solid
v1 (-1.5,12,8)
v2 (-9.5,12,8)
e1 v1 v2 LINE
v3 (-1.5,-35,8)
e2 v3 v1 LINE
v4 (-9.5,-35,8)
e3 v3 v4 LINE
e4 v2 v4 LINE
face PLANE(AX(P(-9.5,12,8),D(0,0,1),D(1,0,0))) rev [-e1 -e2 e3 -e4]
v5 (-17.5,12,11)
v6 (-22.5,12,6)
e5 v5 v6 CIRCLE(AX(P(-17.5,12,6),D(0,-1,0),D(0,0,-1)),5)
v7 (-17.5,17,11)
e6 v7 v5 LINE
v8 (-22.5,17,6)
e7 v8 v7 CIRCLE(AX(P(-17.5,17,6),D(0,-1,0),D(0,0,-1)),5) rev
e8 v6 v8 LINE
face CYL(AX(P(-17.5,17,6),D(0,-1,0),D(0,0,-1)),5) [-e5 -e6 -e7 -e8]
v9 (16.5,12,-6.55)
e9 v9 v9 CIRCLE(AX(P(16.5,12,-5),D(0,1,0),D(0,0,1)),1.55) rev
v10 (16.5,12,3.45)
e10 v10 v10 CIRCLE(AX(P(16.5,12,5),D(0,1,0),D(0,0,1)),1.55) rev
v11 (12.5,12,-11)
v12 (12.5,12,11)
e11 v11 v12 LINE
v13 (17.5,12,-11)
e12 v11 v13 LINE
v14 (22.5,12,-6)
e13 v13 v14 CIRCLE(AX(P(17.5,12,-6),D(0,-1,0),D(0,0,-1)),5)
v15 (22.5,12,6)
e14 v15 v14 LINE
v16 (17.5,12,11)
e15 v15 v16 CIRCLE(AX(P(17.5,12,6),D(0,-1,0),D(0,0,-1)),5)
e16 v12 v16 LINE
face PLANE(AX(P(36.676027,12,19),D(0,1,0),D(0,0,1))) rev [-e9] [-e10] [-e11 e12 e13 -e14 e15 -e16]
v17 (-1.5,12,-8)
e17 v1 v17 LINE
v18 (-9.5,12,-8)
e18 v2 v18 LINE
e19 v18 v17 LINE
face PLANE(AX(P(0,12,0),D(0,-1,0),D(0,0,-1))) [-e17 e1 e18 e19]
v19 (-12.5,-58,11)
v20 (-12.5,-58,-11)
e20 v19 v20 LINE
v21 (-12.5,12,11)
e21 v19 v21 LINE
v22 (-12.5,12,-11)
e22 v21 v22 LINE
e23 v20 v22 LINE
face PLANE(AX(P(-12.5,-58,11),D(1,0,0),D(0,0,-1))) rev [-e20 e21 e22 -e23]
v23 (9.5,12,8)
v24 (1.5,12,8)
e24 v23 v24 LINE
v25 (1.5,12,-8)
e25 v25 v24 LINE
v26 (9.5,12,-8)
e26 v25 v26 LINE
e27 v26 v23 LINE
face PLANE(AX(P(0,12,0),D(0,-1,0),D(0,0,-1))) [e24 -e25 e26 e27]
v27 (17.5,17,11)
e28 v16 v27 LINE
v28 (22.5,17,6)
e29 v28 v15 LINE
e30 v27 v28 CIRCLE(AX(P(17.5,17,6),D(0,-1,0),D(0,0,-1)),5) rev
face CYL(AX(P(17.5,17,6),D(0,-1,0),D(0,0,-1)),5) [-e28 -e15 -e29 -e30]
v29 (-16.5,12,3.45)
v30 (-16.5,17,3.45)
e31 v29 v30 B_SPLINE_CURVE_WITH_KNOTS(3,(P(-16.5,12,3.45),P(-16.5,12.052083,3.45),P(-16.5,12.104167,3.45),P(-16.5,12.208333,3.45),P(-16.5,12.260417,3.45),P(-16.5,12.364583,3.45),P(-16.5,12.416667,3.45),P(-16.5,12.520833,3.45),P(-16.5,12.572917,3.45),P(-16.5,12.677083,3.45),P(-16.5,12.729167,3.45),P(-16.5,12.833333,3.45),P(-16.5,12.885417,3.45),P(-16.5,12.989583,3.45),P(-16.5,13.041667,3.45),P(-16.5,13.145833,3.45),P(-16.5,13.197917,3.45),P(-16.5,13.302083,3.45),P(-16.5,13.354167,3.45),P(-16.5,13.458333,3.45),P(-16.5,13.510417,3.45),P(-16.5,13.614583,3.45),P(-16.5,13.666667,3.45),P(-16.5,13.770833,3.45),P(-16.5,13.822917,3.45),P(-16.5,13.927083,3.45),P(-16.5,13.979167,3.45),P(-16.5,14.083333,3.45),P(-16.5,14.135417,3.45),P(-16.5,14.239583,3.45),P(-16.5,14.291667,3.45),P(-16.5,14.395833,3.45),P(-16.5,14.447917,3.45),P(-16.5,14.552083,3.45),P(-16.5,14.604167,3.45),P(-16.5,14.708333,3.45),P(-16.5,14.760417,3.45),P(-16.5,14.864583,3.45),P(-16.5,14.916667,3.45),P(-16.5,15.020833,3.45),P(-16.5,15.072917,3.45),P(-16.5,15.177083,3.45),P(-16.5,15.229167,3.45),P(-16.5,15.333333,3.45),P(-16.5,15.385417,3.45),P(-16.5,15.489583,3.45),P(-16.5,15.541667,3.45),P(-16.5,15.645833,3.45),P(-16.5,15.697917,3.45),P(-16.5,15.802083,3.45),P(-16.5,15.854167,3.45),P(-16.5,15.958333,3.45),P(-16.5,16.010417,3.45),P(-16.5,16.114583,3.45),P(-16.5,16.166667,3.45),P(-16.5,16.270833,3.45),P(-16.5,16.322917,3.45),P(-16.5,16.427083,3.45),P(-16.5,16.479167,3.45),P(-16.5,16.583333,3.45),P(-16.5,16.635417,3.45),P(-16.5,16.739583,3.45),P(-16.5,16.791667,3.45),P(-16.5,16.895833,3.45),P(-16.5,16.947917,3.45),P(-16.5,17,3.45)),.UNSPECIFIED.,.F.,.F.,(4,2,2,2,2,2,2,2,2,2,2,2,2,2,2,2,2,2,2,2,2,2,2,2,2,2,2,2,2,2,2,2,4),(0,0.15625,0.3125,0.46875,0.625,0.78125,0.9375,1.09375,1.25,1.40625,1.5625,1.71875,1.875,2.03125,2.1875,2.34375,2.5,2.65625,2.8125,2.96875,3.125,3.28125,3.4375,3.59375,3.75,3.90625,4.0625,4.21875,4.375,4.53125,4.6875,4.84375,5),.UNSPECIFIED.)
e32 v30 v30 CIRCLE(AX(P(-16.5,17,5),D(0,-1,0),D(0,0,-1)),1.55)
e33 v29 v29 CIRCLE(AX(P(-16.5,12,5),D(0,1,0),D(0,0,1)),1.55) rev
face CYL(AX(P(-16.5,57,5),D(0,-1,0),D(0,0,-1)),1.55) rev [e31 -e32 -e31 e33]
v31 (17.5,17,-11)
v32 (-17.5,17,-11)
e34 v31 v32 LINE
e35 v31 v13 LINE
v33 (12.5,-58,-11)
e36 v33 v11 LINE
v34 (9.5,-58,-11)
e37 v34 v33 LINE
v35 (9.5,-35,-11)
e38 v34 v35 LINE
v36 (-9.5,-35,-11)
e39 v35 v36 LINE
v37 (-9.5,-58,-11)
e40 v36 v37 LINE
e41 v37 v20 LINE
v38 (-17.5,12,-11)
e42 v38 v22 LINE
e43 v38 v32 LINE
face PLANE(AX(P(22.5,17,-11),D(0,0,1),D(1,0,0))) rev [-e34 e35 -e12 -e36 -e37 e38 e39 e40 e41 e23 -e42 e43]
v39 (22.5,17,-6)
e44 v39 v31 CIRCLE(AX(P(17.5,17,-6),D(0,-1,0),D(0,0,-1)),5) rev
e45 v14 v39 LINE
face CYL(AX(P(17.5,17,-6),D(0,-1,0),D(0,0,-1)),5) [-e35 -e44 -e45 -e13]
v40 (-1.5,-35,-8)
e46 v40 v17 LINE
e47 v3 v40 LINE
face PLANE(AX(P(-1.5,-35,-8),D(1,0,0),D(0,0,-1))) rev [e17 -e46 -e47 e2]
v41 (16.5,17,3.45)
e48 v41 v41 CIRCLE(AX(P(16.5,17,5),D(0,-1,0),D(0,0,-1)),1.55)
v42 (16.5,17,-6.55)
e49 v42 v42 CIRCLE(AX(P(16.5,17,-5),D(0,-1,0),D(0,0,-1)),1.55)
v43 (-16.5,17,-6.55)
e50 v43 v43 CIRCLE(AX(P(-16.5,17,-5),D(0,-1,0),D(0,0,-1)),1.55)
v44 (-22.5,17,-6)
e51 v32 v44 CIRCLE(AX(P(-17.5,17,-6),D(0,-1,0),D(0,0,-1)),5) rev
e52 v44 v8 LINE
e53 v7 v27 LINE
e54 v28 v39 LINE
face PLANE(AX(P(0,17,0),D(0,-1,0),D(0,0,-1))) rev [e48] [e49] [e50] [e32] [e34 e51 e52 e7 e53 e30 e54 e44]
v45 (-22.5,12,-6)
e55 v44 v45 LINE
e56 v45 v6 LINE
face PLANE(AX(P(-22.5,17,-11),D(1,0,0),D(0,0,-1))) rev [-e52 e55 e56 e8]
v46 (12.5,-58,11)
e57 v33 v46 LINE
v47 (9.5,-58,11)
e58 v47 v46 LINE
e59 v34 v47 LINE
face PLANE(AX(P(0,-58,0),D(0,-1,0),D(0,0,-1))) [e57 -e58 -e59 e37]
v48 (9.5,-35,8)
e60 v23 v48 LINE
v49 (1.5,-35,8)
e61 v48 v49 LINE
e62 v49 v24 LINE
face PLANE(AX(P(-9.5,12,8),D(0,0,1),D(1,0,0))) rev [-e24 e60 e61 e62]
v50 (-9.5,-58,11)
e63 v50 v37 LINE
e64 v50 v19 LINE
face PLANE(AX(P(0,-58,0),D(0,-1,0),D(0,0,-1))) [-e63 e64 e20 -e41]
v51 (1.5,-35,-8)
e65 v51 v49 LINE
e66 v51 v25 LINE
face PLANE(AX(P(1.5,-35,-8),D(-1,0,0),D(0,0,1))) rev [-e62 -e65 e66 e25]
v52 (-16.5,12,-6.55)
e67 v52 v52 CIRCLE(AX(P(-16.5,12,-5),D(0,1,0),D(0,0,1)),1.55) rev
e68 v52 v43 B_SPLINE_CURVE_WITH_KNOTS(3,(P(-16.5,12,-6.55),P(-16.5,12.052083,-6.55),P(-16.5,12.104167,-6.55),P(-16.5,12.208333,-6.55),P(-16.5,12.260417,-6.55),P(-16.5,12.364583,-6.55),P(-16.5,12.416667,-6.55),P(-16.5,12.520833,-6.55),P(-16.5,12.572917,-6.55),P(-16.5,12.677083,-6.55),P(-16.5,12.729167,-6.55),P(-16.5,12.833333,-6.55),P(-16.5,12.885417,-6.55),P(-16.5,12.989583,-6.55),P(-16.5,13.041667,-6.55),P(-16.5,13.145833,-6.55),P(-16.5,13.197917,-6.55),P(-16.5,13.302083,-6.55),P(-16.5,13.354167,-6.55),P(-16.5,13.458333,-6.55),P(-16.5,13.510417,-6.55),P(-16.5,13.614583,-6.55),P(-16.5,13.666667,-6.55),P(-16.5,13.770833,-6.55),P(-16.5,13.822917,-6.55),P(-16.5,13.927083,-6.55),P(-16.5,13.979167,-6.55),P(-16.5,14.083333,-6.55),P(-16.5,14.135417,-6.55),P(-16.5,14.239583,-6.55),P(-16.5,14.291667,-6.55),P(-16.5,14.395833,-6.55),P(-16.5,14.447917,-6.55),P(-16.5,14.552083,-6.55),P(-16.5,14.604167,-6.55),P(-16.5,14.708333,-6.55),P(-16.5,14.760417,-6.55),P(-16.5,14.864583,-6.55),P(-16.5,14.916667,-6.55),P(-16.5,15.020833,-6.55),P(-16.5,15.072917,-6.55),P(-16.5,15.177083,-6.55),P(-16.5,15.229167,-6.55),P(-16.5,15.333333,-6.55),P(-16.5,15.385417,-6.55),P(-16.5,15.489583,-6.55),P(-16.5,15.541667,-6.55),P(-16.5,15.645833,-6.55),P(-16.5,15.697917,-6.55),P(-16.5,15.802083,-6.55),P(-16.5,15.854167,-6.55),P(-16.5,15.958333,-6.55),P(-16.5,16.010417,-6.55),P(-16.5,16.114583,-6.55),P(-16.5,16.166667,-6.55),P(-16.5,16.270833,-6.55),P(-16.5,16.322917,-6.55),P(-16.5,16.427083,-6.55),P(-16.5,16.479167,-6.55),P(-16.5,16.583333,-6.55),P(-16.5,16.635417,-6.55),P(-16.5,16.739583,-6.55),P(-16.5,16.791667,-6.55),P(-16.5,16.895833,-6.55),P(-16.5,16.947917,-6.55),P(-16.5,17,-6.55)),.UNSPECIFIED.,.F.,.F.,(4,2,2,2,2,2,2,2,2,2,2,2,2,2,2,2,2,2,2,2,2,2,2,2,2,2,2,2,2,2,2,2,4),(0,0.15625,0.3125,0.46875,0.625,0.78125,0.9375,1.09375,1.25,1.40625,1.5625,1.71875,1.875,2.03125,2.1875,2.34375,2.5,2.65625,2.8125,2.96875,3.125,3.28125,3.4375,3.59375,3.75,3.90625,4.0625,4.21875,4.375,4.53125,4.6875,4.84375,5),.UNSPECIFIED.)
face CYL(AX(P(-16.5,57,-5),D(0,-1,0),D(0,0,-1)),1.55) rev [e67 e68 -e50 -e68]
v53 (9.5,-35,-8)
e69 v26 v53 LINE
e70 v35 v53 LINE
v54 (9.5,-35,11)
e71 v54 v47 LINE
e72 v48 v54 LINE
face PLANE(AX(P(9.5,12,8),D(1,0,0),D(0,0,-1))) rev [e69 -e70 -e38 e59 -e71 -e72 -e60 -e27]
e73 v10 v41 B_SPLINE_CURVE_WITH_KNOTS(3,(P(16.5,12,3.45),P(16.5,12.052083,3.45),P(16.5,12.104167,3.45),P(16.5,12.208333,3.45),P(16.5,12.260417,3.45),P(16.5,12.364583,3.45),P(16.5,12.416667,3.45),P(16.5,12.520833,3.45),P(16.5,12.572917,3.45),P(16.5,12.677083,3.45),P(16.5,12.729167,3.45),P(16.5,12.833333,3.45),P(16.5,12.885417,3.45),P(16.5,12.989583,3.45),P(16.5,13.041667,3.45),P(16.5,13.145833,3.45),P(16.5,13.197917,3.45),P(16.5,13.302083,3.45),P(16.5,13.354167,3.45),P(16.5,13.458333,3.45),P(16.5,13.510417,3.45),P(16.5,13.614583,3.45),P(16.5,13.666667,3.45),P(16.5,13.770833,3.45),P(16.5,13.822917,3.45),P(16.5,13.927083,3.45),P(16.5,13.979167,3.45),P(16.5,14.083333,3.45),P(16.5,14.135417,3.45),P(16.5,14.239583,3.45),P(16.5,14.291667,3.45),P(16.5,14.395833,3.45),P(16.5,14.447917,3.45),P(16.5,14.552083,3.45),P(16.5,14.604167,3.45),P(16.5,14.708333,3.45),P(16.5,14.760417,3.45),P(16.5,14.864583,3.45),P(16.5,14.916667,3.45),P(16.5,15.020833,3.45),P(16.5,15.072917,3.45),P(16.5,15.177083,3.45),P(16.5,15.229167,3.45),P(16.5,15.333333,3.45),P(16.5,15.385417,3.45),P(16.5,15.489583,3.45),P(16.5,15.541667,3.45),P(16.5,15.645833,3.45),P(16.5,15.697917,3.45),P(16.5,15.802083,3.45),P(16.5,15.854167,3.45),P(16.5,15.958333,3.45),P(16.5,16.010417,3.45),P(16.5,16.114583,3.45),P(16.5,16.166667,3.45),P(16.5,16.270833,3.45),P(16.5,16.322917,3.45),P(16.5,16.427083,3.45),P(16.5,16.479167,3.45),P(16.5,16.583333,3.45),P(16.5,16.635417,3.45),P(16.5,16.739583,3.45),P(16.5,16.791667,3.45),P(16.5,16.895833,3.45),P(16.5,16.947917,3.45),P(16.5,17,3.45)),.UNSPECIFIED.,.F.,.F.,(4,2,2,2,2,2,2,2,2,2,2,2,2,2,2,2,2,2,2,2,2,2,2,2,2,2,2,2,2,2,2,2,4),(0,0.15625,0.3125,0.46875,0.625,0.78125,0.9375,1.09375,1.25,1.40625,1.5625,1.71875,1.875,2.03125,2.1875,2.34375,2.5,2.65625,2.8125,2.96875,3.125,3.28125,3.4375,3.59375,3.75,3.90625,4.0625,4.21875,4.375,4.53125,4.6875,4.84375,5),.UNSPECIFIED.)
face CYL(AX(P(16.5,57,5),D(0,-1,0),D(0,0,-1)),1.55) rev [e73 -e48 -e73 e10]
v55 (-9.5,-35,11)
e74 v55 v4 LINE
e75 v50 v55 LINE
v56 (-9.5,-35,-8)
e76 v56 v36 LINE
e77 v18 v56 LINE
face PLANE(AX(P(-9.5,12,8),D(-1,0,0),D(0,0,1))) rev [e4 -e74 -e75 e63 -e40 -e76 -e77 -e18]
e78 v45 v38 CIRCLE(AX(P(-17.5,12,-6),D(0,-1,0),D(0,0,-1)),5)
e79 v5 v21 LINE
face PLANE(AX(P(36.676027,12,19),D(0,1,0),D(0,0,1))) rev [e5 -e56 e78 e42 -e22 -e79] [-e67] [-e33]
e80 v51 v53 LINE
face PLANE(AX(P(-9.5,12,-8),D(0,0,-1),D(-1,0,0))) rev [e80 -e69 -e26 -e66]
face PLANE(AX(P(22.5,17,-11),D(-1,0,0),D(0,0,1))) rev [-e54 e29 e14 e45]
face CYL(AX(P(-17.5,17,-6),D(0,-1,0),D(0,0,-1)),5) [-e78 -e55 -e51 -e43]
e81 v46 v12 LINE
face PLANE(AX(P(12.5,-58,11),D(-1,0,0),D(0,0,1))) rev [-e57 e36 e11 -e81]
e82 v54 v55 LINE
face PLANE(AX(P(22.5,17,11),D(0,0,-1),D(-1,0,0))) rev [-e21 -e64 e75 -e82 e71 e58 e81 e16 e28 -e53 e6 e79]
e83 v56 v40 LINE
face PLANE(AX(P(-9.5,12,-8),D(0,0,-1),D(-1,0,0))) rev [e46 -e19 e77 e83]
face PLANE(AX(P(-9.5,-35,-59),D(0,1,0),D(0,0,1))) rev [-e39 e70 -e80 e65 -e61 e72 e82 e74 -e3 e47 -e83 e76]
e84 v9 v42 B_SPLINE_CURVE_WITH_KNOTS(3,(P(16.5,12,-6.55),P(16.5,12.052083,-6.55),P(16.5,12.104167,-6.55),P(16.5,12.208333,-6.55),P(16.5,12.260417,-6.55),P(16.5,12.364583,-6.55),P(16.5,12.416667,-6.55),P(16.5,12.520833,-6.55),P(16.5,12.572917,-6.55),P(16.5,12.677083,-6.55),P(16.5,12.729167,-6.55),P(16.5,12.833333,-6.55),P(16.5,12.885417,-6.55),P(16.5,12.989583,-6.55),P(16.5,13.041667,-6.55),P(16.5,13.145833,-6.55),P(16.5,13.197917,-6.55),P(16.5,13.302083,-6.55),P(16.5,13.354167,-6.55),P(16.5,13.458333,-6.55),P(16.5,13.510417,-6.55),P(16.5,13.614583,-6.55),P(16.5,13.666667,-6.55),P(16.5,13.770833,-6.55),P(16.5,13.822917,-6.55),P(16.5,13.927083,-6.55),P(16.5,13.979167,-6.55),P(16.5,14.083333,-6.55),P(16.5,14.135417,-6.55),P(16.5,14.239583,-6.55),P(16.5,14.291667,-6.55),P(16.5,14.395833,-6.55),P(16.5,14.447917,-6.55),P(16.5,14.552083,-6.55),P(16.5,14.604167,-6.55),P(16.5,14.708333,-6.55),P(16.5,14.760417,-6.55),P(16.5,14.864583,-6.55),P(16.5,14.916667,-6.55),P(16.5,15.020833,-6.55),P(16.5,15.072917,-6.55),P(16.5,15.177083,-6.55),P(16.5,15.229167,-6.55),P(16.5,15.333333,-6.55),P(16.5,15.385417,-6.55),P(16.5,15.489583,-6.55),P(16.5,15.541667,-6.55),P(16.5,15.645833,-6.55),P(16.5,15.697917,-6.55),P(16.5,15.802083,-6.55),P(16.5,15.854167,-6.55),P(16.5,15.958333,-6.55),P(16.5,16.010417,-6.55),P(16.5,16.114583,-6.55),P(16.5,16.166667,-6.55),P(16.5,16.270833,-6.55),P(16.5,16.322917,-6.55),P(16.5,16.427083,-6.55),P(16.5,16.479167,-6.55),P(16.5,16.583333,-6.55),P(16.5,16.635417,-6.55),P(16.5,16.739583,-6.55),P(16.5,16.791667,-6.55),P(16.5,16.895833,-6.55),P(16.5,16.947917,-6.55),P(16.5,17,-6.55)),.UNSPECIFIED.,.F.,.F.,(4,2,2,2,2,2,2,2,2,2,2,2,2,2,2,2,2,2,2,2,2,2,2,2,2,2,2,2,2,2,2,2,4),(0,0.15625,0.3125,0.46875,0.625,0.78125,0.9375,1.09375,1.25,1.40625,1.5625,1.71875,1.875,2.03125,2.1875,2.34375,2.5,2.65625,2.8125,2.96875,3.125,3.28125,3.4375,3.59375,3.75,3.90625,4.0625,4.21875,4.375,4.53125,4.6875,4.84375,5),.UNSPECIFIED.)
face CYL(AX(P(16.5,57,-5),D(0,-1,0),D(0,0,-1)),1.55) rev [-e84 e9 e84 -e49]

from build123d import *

# Parameters (mm, degrees)
CROQUIS1_R              = 10
CROQUIS1_R_2            = 3.5
EXTRUIR1_DEPTH          = 12
CROQUIS2_W              = 45
CROQUIS2_H              = 22
SALIENTE_EXTRUIR1_DEPTH = 5
REDONDEO1_R             = 5
REDONDEO2_R             = 5
REDONDEO3_R             = 5
REDONDEO4_R             = 5
CROQUIS3_R              = 4.1
CORTAR_EXTRUIR1_DEPTH   = 45
CROQUIS4_R              = 1.55
CORTAR_EXTRUIR2_DEPTH   = 45
CROQUIS7_W              = 22.113905464
CROQUIS7_H              = 24
CORTAR_EXTRUIR4_DEPTH   = 70
CROQUIS8_W              = 45
CROQUIS8_H              = 22
SALIENTE_EXTRUIR2_DEPTH = 5
REDONDEO5_R             = 5
REDONDEO6_R             = 5
REDONDEO7_R             = 5
REDONDEO8_R             = 5
CORTAR_EXTRUIR5_START   = -15
CROQUIS9_R              = 1.55
CROQUIS9_R_2            = 4.1
CORTAR_EXTRUIR5_DEPTH   = 15
CROQUIS10_W             = 11.329180456
CROQUIS10_H             = 11.81266377
SALIENTE_EXTRUIR3_DEPTH = 10
CROQUIS11_W             = 64.145296703
CROQUIS11_H             = 8.366265536
CORTAR_EXTRUIR8_DEPTH   = 30
CROQUIS12_W             = 25
CROQUIS12_H             = 22
SALIENTE_EXTRUIR4_DEPTH = 70
CROQUIS13_W             = 19
CROQUIS13_H             = 16
CORTAR_EXTRUIR9_DEPTH   = 70
CROQUIS14_W             = 19
CROQUIS14_H             = 23
CORTAR_EXTRUIR10_DEPTH  = 70
CROQUIS15_W             = 16.823011057
CROQUIS15_H             = 23
CROQUIS15_W_2           = 14.386150498
CORTAR_EXTRUIR11_DEPTH  = 70
REDONDEO9_R             = 5
REDONDEO10_R            = 5
REDONDEO11_R            = 5
REDONDEO12_R            = 5
CROQUIS16_W             = 3
CROQUIS16_H             = 16
SALIENTE_EXTRUIR5_DEPTH = 47
CROQUIS17_W             = 22
CROQUIS17_H             = 23
SALIENTE_EXTRUIR6_DEPTH = 3
CROQUIS18_W             = 22
CROQUIS18_H             = 23
SALIENTE_EXTRUIR7_DEPTH = 3


with BuildPart() as part:
    # Croquis1 → Extruir1 (new body)
    with BuildSketch(Plane(origin=(0, 0, 0), x_dir=(1, 0, 0), z_dir=(0, 1, 0))):
        with Locations(Location((0, 0, 0), (0, 0, 270))):
            Circle(CROQUIS1_R)
        with Locations(Location((0, 0, 0), (0, 0, 270))):
            Circle(CROQUIS1_R_2, mode=Mode.SUBTRACT)
    extrude(amount=EXTRUIR1_DEPTH)

    # Croquis2 → Saliente-Extruir1 (add)
    with BuildSketch(Plane(origin=(0, 12, 0), x_dir=(1, 0, 0), z_dir=(0, 1, 0))):
        Rectangle(CROQUIS2_W, CROQUIS2_H)
    extrude(amount=SALIENTE_EXTRUIR1_DEPTH)

    # Redondeo1
    redondeo1_edges = [part.edges().sort_by_distance(p)[0] for p in [
        (22.5, 14.5, -11),
    ]]
    fillet(redondeo1_edges, radius=REDONDEO1_R)

    # Redondeo2
    redondeo2_edges = [part.edges().sort_by_distance(p)[0] for p in [
        (22.5, 14.5, 11),
    ]]
    fillet(redondeo2_edges, radius=REDONDEO2_R)

    # Redondeo3
    redondeo3_edges = [part.edges().sort_by_distance(p)[0] for p in [
        (-22.5, 14.5, 11),
    ]]
    fillet(redondeo3_edges, radius=REDONDEO3_R)

    # Redondeo4
    redondeo4_edges = [part.edges().sort_by_distance(p)[0] for p in [
        (-22.5, 14.5, -11),
    ]]
    fillet(redondeo4_edges, radius=REDONDEO4_R)

    # Croquis3 → Cortar-Extruir1 (cut)
    with BuildSketch(Plane.XZ):
        with Locations(Location((0, 0, 0), (0, 0, 270))):
            Circle(CROQUIS3_R)
    extrude(amount=-CORTAR_EXTRUIR1_DEPTH, mode=Mode.SUBTRACT)

    # Croquis4 → Cortar-Extruir2 (cut)
    with BuildSketch(Plane.XZ.offset(-12)):
        with Locations(Location((-16.5, 5, 0), (0, 0, 270))):
            Circle(CROQUIS4_R)
        with Locations(Location((-16.5, -5, 0), (0, 0, 270))):
            Circle(CROQUIS4_R)
        with Locations(Location((16.5, 5, 0), (0, 0, 270))):
            Circle(CROQUIS4_R)
        with Locations(Location((16.5, -5, 0), (0, 0, 270))):
            Circle(CROQUIS4_R)
    extrude(amount=-CORTAR_EXTRUIR2_DEPTH, mode=Mode.SUBTRACT)

    # Croquis7 → Cortar-Extruir4 (cut)
    with BuildSketch(Plane.XY.offset(11)):
        Rectangle(CROQUIS7_W, CROQUIS7_H)
    extrude(amount=-CORTAR_EXTRUIR4_DEPTH, mode=Mode.SUBTRACT)

    # Croquis8 → Saliente-Extruir2 (add)
    with BuildSketch(Plane.XZ.offset(-12)):
        Rectangle(CROQUIS8_W, CROQUIS8_H)
    extrude(amount=SALIENTE_EXTRUIR2_DEPTH)

    # Redondeo5
    redondeo5_edges = [part.edges().sort_by_distance(p)[0] for p in [
        (-22.5, 9.5, -11),
    ]]
    fillet(redondeo5_edges, radius=REDONDEO5_R)

    # Redondeo6
    redondeo6_edges = [part.edges().sort_by_distance(p)[0] for p in [
        (22.5, 9.5, -11),
    ]]
    fillet(redondeo6_edges, radius=REDONDEO6_R)

    # Redondeo7
    redondeo7_edges = [part.edges().sort_by_distance(p)[0] for p in [
        (22.5, 9.5, 11),
    ]]
    fillet(redondeo7_edges, radius=REDONDEO7_R)

    # Redondeo8
    redondeo8_edges = [part.edges().sort_by_distance(p)[0] for p in [
        (-22.5, 9.5, 11),
    ]]
    fillet(redondeo8_edges, radius=REDONDEO8_R)

    # Croquis9 → Cortar-Extruir5 (cut)
    with BuildSketch(Plane(origin=(0, 17, 0), x_dir=(1, 0, 0), z_dir=(0, 1, 0)).offset(CORTAR_EXTRUIR5_START)):
        with Locations(Location((-16.5, -5, 0), (0, 0, 90))):
            Circle(CROQUIS9_R)
        with Locations(Location((-16.5, 5, 0), (0, 0, 90))):
            Circle(CROQUIS9_R)
        with Locations(Location((16.5, -5, 0), (0, 0, 90))):
            Circle(CROQUIS9_R)
        with Locations(Location((16.5, 5, 0), (0, 0, 90))):
            Circle(CROQUIS9_R)
        with Locations(Location((0, 0, 0), (0, 0, 90))):
            Circle(CROQUIS9_R_2)
    extrude(amount=CORTAR_EXTRUIR5_DEPTH, mode=Mode.SUBTRACT)

    # Croquis10 → Saliente-Extruir3 (add)
    with BuildSketch(Plane(origin=(0, 17, 0), x_dir=(1, 0, 0), z_dir=(0, 1, 0))):
        Rectangle(CROQUIS10_W, CROQUIS10_H)
    extrude(amount=-SALIENTE_EXTRUIR3_DEPTH)

    # Croquis11 → Cortar-Extruir8 (cut)
    with BuildSketch(Plane(origin=(0, 0, -11), x_dir=(-1, 0, 0), z_dir=(0, 0, -1))):
        with Locations((-4.603378936, 7.816867232)):
            Rectangle(CROQUIS11_W, CROQUIS11_H)
    extrude(amount=-CORTAR_EXTRUIR8_DEPTH, mode=Mode.SUBTRACT)

    # Croquis12 → Saliente-Extruir4 (add)
    with BuildSketch(Plane.XZ.offset(-12)):
        Rectangle(CROQUIS12_W, CROQUIS12_H)
    extrude(amount=SALIENTE_EXTRUIR4_DEPTH)

    # Croquis13 → Cortar-Extruir9 (cut)
    with BuildSketch(Plane.XZ.offset(58)):
        Rectangle(CROQUIS13_W, CROQUIS13_H)
    extrude(amount=-CORTAR_EXTRUIR9_DEPTH, mode=Mode.SUBTRACT)

    # Croquis14 → Cortar-Extruir10 (cut)
    with BuildSketch(Plane.XY.offset(11)):
        with Locations((0, -46.5)):
            Rectangle(CROQUIS14_W, CROQUIS14_H)
    extrude(amount=-CORTAR_EXTRUIR10_DEPTH, mode=Mode.SUBTRACT)

    # Croquis15 → Cortar-Extruir11 (cut)
    with BuildSketch(Plane(origin=(12.5, 0, 0), x_dir=(0, 0, -1), z_dir=(1, 0, 0))):
        with Locations((-16.411505529, -46.5)):
            Rectangle(CROQUIS15_W, CROQUIS15_H)
        with Locations((15.193075249, -46.5)):
            Rectangle(CROQUIS15_W_2, CROQUIS15_H)
    extrude(amount=-CORTAR_EXTRUIR11_DEPTH, mode=Mode.SUBTRACT)

    # Redondeo9
    # the kernel refuses this fillet: 5 mm, written as the material it adds along each edge
    with BuildSketch(Plane(origin=(-9.5, -35, -8), x_dir=(0, 0, -1), z_dir=(-1, 0, 0))) as redondeo9_piece_1:
        with BuildLine():
            CenterArc((5, 4.582575695), REDONDEO9_R, 180, 66.421821522)
            Line((0, 4.582575695), (0, 0))
            Line((0, 0), (3, 0))
        make_face()
    extrude(amount=3)

    # Redondeo10
    # the kernel refuses this fillet: 5 mm, written as the material it adds along each edge
    with BuildSketch(Plane(origin=(12.5, -35, -8), x_dir=(0, 0, -1), z_dir=(-1, 0, 0))) as redondeo10_piece_1:
        with BuildLine():
            CenterArc((5, 4.582575695), REDONDEO10_R, 180, 66.421821522)
            Line((0, 4.582575695), (0, 0))
            Line((0, 0), (3, 0))
        make_face()
    extrude(amount=3)

    # Redondeo11
    # the kernel refuses this fillet: 5 mm, written as the material it adds along each edge
    with BuildSketch(Plane(origin=(-9.5, -35, 8), x_dir=(0, 0, 1), z_dir=(-1, 0, 0))) as redondeo11_piece_1:
        with BuildLine():
            CenterArc((5, -4.582575695), REDONDEO11_R, 113.578178478, 66.421821522)
            Line((0, -4.582575695), (0, 0))
            Line((0, 0), (3, 0))
        make_face()
    extrude(amount=3)

    # Redondeo12
    # the kernel refuses this fillet: 5 mm, written as the material it adds along each edge
    with BuildSketch(Plane(origin=(12.5, -35, 8), x_dir=(0, 0, 1), z_dir=(-1, 0, 0))) as redondeo12_piece_1:
        with BuildLine():
            CenterArc((5, -4.582575695), REDONDEO12_R, 113.578178478, 66.421821522)
            Line((0, -4.582575695), (0, 0))
            Line((0, 0), (3, 0))
        make_face()
    extrude(amount=3)

    # Croquis16 → Saliente-Extruir5 (add)
    with BuildSketch(Plane.XZ.offset(-12)):
        Rectangle(CROQUIS16_W, CROQUIS16_H)
    extrude(amount=SALIENTE_EXTRUIR5_DEPTH)

    # Croquis17 → Saliente-Extruir6 (add)
    with BuildSketch(Plane(origin=(12.5, 0, 0), x_dir=(0, 0, -1), z_dir=(1, 0, 0))):
        with Locations((0, -46.5)):
            Rectangle(CROQUIS17_W, CROQUIS17_H)
    extrude(amount=-SALIENTE_EXTRUIR6_DEPTH)

    # Croquis18 → Saliente-Extruir7 (add)
    with BuildSketch(Plane.ZY.offset(12.5)):
        with Locations((0, -46.5)):
            Rectangle(CROQUIS18_W, CROQUIS18_H)
    extrude(amount=-SALIENTE_EXTRUIR7_DEPTH)


solid = part.part
